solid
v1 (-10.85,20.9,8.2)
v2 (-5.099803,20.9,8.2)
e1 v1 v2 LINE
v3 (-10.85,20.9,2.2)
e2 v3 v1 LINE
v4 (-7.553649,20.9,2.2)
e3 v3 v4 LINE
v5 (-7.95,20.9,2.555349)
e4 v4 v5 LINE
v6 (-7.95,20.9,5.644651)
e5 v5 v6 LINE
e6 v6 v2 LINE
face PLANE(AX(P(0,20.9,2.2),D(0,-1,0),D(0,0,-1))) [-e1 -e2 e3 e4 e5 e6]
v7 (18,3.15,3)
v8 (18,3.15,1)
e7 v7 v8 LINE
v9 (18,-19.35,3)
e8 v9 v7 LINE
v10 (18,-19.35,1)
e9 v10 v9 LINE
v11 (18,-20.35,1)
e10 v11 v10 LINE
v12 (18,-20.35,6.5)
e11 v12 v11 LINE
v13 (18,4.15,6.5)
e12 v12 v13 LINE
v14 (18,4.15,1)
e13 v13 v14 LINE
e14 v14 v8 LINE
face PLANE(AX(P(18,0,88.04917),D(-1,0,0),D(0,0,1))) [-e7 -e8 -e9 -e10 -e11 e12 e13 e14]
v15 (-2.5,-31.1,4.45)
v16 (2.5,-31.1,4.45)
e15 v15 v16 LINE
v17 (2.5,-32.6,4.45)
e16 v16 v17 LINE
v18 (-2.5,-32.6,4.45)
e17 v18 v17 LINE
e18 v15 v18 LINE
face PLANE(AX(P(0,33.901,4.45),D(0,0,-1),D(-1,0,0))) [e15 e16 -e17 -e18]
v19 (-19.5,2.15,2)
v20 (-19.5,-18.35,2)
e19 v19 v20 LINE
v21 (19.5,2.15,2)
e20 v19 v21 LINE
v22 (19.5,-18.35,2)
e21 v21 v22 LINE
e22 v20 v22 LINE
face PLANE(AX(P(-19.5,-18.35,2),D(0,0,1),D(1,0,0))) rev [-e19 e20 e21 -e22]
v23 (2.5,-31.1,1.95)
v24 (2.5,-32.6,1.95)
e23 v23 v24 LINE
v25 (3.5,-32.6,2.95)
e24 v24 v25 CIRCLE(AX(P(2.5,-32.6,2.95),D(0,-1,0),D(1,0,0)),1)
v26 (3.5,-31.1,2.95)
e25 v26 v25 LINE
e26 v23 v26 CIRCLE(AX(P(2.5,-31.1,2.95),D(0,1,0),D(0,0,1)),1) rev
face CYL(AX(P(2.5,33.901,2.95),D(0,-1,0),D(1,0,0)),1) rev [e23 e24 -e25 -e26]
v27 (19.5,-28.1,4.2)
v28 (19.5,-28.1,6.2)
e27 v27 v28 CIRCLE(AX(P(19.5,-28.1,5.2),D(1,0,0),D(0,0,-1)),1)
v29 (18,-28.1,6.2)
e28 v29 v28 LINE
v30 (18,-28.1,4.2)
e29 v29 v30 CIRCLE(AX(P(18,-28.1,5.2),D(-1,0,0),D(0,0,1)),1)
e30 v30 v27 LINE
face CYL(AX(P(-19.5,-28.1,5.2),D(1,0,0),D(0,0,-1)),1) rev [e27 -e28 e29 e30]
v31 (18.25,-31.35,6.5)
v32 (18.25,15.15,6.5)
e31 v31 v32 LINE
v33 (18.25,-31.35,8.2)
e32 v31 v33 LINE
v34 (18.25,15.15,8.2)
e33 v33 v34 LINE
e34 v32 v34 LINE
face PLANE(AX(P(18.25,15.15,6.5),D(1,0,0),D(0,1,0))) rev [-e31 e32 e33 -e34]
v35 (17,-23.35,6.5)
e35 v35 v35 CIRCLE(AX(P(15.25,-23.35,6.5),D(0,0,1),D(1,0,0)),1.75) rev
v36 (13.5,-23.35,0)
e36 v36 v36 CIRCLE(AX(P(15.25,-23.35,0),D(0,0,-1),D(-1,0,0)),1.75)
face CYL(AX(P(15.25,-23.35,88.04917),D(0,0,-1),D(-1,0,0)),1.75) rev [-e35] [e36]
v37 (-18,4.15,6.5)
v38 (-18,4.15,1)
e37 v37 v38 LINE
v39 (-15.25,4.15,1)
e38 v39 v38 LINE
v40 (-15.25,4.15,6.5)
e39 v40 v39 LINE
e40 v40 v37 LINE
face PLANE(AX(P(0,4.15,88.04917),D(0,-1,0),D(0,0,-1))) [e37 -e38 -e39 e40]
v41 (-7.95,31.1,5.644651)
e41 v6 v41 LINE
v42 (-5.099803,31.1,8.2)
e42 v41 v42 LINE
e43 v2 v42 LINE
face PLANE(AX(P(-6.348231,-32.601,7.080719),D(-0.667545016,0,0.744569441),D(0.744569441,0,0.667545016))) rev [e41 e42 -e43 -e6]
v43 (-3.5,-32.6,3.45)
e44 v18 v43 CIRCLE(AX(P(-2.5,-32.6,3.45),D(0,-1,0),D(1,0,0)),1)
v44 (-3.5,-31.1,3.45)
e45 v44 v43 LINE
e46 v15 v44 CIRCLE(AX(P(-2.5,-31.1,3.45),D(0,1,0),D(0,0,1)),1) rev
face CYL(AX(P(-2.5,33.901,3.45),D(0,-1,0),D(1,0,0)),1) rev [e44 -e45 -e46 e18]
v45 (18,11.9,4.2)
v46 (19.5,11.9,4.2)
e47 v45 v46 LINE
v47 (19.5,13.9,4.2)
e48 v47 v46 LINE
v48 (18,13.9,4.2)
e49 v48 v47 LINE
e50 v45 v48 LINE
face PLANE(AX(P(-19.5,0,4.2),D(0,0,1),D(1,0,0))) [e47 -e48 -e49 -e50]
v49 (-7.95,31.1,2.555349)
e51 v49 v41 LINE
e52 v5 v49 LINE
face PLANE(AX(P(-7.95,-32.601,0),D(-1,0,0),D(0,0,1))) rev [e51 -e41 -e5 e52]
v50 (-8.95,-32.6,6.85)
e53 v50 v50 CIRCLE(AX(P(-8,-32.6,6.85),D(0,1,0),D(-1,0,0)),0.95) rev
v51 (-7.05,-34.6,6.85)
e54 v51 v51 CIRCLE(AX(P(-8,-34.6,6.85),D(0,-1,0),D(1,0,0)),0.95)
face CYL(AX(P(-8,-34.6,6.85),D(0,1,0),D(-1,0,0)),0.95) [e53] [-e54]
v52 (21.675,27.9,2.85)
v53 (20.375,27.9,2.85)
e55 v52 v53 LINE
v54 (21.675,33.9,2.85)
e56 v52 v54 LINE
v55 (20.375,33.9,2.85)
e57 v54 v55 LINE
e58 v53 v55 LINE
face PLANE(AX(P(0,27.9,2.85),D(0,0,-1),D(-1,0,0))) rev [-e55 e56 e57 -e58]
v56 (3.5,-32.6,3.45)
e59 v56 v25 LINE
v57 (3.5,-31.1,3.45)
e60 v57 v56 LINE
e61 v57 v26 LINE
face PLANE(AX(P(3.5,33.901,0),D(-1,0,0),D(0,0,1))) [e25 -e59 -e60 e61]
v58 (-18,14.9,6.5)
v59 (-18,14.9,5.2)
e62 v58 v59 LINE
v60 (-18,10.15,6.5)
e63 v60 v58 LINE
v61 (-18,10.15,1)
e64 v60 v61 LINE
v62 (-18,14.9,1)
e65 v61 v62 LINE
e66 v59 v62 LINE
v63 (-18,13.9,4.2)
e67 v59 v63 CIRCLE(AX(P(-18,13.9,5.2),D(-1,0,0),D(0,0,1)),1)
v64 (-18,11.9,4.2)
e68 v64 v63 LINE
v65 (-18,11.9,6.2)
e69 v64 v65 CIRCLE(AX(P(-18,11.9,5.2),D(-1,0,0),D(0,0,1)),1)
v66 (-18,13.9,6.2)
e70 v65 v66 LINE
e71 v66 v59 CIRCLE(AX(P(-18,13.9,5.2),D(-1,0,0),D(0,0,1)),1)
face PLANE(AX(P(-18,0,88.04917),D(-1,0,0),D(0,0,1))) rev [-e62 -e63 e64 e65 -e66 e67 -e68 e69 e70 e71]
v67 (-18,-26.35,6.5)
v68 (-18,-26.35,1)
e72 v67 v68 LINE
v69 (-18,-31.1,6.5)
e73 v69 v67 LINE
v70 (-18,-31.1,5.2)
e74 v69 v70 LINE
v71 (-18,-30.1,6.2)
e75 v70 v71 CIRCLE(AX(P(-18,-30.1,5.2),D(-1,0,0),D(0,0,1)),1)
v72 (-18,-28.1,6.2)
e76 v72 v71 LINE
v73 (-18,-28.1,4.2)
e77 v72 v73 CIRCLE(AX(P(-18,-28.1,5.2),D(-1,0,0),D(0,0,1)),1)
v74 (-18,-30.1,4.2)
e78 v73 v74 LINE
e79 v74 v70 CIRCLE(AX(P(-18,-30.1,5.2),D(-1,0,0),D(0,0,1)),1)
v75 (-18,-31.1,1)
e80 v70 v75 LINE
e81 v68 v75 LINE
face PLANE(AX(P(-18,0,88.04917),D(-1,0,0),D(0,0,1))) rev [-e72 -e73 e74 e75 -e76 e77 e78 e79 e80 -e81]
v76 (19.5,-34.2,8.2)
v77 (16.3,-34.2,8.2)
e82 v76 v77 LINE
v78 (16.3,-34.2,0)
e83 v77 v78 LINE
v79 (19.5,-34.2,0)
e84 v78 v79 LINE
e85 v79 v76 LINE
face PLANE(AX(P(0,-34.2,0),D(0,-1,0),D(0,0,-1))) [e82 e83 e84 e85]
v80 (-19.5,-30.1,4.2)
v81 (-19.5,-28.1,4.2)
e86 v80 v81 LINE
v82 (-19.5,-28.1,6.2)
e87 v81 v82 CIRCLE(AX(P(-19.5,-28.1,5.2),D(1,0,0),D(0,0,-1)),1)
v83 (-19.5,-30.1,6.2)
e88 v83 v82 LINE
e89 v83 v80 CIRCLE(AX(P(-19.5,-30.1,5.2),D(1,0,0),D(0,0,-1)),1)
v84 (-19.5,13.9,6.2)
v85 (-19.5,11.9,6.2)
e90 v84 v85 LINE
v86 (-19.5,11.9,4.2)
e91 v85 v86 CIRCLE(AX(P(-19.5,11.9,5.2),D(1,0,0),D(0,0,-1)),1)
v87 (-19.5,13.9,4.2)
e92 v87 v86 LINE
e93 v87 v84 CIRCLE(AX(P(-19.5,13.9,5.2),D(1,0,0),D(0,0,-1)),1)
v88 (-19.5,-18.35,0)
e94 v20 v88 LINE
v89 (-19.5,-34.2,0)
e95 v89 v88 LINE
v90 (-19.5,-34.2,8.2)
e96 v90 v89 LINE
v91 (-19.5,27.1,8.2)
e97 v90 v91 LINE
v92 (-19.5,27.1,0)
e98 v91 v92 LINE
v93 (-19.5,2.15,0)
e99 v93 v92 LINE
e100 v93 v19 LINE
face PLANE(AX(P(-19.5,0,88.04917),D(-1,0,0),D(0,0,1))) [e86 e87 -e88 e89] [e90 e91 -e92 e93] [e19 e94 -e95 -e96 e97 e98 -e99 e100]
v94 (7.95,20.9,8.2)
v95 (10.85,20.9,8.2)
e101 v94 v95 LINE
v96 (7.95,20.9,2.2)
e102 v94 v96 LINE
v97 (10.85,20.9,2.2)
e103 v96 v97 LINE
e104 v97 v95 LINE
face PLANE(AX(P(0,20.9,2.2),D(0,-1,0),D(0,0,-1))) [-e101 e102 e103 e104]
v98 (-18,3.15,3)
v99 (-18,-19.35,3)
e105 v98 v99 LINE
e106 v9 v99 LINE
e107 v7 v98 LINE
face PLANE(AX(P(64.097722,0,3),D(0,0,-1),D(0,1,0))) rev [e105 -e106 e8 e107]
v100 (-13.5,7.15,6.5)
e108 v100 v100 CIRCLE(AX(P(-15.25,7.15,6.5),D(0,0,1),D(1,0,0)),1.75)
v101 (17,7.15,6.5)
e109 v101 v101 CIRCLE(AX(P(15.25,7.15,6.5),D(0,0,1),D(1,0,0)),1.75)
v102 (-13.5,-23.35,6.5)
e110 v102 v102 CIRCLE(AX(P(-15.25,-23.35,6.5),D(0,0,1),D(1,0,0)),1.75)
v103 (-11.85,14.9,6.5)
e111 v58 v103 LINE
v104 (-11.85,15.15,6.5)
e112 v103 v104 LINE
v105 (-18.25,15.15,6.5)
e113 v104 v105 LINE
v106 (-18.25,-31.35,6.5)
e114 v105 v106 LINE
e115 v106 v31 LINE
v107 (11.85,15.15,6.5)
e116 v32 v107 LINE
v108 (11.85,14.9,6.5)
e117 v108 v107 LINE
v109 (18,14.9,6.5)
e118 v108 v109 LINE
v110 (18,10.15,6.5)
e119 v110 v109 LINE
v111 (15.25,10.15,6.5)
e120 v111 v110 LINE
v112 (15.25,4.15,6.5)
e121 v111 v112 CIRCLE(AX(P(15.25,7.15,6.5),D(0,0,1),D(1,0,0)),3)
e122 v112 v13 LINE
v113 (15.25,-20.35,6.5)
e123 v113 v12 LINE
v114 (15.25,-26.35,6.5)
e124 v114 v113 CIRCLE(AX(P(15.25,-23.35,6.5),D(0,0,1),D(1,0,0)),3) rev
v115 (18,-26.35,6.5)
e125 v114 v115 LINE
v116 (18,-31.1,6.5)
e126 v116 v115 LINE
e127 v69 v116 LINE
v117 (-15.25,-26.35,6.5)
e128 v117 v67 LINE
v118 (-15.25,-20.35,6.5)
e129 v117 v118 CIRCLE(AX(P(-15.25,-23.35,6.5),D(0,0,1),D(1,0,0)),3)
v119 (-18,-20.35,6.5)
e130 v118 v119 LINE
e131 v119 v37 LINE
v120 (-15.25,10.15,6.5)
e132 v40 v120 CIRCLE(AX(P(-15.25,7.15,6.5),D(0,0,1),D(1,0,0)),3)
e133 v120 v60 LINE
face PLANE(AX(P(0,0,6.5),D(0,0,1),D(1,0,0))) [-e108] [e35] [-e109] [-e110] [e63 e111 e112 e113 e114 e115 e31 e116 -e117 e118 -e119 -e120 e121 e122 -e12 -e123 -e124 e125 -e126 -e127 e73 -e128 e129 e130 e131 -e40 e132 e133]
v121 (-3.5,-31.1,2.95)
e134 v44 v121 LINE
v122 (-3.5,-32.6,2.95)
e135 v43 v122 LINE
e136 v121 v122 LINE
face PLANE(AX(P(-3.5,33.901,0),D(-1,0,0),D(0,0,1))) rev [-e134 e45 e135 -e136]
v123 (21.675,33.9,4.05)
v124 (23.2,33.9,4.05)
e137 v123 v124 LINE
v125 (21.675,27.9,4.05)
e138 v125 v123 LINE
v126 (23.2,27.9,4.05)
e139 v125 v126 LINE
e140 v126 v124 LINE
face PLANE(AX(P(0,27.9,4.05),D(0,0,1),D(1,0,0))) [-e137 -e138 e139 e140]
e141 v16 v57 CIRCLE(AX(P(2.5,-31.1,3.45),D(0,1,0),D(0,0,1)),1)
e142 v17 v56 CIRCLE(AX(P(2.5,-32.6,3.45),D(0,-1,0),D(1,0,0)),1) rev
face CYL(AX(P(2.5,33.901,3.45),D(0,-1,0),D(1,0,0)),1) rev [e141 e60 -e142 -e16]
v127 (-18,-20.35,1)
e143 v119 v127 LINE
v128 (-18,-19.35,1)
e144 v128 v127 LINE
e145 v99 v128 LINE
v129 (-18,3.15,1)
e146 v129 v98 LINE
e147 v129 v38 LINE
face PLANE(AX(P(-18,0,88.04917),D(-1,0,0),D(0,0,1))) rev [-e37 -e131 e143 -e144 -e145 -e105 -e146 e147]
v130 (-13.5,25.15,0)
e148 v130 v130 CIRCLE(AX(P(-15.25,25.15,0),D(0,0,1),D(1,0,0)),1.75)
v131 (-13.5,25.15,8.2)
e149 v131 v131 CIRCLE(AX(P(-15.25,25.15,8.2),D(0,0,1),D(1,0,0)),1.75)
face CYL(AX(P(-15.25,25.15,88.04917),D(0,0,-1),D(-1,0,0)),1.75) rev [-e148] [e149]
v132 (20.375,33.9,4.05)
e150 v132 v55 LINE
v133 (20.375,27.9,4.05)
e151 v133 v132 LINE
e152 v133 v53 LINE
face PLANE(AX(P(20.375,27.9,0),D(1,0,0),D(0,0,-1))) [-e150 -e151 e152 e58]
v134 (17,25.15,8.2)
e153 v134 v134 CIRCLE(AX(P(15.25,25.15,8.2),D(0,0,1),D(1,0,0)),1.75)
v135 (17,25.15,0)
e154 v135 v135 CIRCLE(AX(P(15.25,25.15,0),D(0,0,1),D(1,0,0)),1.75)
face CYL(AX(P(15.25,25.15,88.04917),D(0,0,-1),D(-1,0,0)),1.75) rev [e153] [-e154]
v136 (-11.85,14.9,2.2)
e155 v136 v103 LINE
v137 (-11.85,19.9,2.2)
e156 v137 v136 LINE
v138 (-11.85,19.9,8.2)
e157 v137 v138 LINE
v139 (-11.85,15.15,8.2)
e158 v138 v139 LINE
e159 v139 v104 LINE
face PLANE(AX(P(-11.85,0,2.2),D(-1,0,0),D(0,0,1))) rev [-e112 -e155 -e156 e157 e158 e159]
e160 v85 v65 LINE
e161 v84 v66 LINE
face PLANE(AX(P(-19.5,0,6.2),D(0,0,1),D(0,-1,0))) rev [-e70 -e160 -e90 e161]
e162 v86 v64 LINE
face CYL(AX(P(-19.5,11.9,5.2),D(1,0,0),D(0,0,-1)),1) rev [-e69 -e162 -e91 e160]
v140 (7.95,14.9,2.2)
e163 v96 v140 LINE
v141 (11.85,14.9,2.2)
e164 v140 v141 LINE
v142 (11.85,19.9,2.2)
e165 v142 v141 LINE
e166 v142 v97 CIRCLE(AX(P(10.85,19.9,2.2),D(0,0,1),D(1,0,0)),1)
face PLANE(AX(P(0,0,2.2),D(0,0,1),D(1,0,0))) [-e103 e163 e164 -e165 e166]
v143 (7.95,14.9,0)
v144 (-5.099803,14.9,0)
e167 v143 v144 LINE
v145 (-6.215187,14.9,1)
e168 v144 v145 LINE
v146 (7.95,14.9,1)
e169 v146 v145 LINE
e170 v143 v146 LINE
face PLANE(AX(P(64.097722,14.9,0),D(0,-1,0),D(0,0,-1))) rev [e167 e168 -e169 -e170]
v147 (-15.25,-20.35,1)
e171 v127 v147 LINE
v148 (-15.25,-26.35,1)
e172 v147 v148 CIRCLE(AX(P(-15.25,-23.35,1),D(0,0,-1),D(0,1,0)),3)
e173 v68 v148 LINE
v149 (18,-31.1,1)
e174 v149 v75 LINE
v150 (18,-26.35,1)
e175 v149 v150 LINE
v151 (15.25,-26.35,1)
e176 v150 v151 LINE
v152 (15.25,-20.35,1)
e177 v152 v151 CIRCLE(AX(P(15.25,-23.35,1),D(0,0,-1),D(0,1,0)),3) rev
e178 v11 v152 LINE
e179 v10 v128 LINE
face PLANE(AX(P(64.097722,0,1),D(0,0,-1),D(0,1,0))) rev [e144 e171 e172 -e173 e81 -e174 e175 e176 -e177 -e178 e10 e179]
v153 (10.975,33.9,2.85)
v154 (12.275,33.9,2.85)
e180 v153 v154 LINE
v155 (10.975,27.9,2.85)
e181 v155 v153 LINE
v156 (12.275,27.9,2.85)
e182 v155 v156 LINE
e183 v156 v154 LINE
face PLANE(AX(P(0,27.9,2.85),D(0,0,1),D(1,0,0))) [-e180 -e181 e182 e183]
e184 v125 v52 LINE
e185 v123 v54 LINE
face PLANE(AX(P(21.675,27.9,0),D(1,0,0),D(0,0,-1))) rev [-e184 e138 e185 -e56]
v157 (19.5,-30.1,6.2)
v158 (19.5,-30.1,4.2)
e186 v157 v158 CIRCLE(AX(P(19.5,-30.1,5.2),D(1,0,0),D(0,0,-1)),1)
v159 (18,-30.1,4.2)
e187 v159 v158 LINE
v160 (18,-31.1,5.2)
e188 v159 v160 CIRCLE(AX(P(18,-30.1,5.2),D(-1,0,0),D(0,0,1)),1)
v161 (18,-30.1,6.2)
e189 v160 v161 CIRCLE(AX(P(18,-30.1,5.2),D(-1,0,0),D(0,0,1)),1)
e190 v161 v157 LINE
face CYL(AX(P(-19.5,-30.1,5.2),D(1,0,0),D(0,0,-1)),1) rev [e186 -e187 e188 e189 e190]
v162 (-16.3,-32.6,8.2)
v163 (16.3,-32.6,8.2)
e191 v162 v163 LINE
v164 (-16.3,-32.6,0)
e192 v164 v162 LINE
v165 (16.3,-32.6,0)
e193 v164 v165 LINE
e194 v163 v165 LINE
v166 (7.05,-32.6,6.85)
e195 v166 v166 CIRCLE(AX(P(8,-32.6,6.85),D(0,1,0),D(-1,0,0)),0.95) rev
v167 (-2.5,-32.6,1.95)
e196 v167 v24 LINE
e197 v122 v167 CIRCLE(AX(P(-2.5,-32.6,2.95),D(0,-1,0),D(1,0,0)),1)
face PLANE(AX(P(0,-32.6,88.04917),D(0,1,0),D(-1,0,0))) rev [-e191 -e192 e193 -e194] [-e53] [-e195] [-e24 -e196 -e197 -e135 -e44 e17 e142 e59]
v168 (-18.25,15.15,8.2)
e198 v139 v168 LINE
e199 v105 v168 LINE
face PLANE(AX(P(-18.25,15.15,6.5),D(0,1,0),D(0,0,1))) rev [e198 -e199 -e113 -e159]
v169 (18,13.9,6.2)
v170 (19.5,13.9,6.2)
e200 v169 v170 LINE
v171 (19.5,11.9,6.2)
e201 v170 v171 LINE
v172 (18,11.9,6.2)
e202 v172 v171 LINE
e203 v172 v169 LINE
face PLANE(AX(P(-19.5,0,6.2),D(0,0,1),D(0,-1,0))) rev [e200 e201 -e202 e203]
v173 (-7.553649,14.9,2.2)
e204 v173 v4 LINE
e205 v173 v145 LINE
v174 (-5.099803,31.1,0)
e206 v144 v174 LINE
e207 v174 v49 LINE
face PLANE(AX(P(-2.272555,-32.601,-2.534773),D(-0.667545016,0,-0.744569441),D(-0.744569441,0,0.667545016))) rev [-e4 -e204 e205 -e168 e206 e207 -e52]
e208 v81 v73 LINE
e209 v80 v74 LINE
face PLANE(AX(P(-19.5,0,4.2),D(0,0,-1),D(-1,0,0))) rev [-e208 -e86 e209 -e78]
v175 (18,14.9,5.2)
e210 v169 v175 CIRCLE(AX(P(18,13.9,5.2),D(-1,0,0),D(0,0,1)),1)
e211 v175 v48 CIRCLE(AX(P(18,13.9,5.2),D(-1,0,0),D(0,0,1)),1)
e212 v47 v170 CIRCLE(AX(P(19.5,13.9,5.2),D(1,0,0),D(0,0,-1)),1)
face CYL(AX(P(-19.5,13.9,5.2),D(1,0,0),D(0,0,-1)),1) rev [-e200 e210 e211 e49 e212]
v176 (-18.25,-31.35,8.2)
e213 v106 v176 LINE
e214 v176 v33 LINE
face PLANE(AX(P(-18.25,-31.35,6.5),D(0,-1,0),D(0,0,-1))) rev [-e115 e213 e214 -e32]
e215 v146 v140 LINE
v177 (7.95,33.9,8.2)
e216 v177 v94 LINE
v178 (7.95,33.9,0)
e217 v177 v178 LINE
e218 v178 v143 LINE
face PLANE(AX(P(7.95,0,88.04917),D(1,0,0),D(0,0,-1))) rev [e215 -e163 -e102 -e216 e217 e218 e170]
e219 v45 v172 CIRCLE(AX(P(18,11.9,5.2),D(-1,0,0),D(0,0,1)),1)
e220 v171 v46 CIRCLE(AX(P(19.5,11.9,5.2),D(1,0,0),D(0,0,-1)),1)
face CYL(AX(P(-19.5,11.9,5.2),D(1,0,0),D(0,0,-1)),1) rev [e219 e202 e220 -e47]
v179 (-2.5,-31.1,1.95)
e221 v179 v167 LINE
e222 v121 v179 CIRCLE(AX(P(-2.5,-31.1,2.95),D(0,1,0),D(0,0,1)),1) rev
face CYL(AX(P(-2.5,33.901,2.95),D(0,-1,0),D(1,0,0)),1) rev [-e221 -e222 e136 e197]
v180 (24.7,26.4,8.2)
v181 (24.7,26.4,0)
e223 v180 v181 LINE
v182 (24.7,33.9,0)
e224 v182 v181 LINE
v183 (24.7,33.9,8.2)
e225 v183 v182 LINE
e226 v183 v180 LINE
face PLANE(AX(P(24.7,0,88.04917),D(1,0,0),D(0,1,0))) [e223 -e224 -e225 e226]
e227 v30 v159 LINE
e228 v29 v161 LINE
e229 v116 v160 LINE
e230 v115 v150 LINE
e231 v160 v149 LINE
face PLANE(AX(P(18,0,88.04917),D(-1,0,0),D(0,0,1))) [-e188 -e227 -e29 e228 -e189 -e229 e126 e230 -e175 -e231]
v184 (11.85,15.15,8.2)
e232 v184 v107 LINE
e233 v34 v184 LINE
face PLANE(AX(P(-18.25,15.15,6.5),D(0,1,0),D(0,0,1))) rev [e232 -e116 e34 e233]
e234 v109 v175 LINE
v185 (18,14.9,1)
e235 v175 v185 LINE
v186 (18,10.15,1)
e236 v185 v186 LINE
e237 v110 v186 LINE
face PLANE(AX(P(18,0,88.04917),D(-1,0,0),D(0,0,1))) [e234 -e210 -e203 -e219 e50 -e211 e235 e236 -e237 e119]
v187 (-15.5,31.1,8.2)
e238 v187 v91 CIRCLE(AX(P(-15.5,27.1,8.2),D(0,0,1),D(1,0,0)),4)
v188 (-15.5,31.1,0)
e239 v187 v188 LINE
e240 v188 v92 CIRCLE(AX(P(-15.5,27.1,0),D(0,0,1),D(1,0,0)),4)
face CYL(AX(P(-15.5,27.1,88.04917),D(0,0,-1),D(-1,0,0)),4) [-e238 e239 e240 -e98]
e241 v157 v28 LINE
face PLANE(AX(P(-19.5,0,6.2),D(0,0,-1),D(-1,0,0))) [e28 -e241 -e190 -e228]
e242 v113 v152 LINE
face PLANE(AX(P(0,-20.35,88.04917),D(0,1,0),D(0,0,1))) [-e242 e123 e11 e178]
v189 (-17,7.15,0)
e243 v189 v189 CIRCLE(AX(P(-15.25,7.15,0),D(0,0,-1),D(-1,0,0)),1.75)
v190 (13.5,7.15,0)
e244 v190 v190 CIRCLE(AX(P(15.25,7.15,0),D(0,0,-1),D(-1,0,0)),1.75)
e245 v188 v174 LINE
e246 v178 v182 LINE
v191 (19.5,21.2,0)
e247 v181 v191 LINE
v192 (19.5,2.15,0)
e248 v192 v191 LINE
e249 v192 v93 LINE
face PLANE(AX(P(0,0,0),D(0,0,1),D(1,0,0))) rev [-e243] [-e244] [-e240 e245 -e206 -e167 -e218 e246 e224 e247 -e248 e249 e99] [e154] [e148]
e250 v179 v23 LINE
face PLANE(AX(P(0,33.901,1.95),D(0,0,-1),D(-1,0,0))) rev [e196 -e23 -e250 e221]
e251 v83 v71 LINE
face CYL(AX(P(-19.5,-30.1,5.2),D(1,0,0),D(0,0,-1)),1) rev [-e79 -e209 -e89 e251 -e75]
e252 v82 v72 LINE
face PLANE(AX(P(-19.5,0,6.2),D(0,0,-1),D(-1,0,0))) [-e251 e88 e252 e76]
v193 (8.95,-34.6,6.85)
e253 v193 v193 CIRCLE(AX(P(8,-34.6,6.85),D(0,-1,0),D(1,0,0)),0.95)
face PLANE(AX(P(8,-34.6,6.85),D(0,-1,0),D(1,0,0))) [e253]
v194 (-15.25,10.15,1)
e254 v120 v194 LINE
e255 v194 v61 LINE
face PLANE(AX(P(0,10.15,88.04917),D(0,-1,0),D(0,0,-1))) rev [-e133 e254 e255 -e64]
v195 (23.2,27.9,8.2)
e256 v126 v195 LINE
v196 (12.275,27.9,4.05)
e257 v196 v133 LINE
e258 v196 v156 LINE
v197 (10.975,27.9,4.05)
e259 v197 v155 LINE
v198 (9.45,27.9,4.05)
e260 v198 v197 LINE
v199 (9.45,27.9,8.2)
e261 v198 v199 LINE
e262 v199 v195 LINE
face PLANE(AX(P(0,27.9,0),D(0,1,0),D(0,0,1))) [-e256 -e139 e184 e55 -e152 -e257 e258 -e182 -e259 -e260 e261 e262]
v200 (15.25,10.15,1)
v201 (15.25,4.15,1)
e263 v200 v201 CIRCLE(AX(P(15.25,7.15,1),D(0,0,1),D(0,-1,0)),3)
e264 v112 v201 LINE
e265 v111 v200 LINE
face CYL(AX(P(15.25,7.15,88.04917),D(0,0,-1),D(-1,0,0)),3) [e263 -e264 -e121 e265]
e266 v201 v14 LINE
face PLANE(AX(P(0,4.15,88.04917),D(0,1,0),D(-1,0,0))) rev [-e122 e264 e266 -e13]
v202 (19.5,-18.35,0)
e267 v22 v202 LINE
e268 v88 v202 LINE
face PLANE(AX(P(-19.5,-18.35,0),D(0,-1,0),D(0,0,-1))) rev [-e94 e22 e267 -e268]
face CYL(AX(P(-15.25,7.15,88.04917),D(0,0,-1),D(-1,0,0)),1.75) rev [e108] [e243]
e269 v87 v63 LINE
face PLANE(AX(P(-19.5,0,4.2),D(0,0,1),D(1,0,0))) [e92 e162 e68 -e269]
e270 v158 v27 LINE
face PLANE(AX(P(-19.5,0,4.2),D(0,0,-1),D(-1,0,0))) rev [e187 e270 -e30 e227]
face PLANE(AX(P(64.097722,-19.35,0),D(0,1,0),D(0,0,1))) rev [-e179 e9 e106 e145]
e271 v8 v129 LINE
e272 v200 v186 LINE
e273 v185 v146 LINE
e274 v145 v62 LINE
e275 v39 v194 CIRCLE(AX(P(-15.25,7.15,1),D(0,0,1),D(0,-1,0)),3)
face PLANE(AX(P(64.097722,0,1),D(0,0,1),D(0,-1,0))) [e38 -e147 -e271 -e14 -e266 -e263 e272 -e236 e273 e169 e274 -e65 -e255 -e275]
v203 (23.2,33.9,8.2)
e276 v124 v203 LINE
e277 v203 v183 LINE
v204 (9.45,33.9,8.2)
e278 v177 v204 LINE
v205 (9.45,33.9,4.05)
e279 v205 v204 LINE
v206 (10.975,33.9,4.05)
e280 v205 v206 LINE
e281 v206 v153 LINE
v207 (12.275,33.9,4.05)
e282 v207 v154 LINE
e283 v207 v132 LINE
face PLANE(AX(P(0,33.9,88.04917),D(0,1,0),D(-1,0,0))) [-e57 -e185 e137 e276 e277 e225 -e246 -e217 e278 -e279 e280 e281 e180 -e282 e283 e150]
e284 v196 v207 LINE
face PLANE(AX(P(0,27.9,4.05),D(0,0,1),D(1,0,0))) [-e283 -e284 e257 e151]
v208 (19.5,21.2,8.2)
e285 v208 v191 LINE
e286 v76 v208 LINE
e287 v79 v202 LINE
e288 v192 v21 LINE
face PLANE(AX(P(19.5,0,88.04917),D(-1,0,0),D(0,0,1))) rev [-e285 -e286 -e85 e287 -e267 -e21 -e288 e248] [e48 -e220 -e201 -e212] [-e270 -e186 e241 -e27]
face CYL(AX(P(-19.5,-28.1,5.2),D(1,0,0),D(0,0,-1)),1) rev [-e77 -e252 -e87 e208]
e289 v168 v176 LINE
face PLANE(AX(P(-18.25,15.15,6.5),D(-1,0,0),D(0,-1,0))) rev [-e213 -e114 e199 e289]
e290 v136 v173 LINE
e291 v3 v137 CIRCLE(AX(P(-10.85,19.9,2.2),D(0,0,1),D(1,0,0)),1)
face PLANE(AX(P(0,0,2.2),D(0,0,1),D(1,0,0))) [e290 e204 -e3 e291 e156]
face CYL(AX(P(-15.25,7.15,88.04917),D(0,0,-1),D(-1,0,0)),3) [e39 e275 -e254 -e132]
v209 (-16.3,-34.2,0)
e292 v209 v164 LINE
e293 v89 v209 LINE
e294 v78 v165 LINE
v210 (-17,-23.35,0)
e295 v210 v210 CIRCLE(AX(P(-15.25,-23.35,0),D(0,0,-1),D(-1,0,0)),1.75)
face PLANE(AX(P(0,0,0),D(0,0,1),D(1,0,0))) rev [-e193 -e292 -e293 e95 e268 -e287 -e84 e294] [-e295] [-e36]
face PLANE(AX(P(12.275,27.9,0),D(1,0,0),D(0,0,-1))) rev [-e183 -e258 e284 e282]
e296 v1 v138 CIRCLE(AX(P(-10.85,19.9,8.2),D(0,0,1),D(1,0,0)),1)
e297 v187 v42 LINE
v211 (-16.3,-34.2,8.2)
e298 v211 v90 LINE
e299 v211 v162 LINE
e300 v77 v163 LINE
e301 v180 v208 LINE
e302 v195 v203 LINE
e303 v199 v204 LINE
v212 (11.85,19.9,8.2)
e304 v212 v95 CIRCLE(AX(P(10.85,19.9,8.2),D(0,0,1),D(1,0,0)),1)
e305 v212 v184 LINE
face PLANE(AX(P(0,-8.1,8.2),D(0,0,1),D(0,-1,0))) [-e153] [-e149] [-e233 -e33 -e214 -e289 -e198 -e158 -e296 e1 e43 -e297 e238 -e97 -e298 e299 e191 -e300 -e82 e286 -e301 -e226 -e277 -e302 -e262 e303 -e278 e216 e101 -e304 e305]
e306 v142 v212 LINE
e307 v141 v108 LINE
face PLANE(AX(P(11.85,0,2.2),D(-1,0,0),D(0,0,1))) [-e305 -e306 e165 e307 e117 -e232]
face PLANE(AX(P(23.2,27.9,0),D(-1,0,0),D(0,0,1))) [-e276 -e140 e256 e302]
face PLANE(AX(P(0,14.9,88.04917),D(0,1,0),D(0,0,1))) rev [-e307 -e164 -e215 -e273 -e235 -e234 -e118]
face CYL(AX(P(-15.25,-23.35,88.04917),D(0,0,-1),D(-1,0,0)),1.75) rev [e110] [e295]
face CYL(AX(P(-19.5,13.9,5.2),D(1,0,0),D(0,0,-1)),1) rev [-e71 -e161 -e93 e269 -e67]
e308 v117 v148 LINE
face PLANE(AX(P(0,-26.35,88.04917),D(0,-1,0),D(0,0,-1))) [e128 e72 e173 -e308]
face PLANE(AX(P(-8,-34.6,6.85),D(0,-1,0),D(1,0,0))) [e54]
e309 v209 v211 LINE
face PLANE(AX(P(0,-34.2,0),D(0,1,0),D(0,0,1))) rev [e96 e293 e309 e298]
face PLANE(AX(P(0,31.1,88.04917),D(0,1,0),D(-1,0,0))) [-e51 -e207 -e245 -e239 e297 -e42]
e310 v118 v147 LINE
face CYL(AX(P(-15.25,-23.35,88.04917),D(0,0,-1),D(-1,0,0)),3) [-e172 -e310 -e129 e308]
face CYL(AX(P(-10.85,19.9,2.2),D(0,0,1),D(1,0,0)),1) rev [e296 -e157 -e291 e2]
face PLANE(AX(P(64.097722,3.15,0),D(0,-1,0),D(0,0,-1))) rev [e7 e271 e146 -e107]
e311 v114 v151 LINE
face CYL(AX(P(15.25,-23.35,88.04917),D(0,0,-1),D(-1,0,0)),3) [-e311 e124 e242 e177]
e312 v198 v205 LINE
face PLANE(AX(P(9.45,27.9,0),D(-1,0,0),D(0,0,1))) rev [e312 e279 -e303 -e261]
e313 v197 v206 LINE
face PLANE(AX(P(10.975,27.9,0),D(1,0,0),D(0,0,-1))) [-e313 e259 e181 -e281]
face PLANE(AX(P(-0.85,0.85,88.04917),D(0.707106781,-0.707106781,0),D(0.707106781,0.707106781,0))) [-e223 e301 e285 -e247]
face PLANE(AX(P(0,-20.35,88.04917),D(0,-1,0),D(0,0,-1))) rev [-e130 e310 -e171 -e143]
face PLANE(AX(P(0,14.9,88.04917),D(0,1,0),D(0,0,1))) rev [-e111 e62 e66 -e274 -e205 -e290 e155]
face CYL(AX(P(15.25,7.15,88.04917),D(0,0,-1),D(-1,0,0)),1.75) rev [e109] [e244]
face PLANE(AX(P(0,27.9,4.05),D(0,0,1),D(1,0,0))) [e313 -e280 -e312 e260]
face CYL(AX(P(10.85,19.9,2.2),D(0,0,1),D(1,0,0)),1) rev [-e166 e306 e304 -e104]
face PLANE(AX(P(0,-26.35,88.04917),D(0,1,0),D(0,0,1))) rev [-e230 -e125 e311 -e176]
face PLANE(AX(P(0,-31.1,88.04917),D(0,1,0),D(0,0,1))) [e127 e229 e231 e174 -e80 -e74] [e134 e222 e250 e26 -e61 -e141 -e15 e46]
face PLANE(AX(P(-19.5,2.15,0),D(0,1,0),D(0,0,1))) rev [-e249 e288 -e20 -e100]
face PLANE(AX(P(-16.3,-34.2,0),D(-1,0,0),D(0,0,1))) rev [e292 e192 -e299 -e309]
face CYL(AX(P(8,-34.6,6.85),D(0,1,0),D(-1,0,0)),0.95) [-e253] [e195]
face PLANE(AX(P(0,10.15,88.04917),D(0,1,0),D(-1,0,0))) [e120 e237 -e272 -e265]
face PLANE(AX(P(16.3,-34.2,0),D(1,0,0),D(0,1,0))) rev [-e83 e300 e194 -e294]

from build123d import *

# Parameters (mm, degrees)
SKETCH1_R              = 1.75
BASE_SHAPE_DEPTH       = 8.2
SKETCH3_W              = 2
SKETCH3_H              = 20.5
STRAP_CUT_DEPTH        = 53.32064602
XT60_CUT_REACH         = 70.811
SKETCH5_R              = 1
POWER_WIRES_CUT_DEPTH  = 53.32064602
SKETCH6_W              = 23.7
SKETCH6_H              = 5
IO_WIRES_CUT_DEPTH     = 6
BOTTOM_DEPTH           = 36
BOTTOM_START           = -1
BOTTOM_HOLES_OUTLINE_R = 1.75
BOTTOM_HOLES_DEPTH     = 1
SKETCH8_W              = 36.5
SKETCH8_H              = 46.5
PCB_CUT_DEPTH          = 1.7
LEDBAR_WIRES_CUT_REACH = 73.411
SKETCH13_W             = 3.2
SKETCH13_H             = 8.2
LEDBAR_SIDES_DEPTH     = 1.6
SKETCH14_R             = 0.95
LEDBAR_MOUNTS_DEPTH    = 2
SKETCH16_W             = 13.75
SKETCH16_H             = 4.15
SKETCH16_W_2           = 1.3
SKETCH16_H_2           = 1.2
BALANCE_PLUG_CUT_DEPTH = 6


with BuildPart() as part:
    # Sketch1 → Base shape (new body)
    with BuildSketch(Plane.XY):
        with BuildLine():
            ThreePointArc((-15.5, 31.1), (-18.328427125, 29.928427125), (-19.5, 27.1))
            Line((-19.5, 27.1), (-19.5, -32.6))
            Line((-19.5, -32.6), (19.5, -32.6))
            Line((19.5, -32.6), (19.5, 21.2))
            Line((19.5, 21.2), (24.7, 26.4))
            Line((24.7, 26.4), (24.7, 33.9))
            Line((24.7, 33.9), (7.95, 33.9))
            Line((7.95, 33.9), (7.95, 31.1))
            Line((7.95, 31.1), (-15.5, 31.1))
        make_face()
        with Locations((-15.25, -23.35)):
            Circle(SKETCH1_R, mode=Mode.SUBTRACT)
        with Locations((15.25, -23.35)):
            Circle(SKETCH1_R, mode=Mode.SUBTRACT)
        with BuildLine():
            Line((-18, -20.35), (-18, 4.15))
            Line((-18, 4.15), (-15.25, 4.15))
            ThreePointArc((-15.25, 4.15), (-12.25, 7.15), (-15.25, 10.15))
            Line((-15.25, 10.15), (-18, 10.15))
            Line((-18, 10.15), (-18, 14.9))
            Line((-18, 14.9), (18, 14.9))
            Line((18, 14.9), (18, 10.15))
            Line((18, 10.15), (15.25, 10.15))
            ThreePointArc((15.25, 10.15), (12.25, 7.15), (15.25, 4.15))
            Line((15.25, 4.15), (18, 4.15))
            Line((18, 4.15), (18, -20.35))
            Line((18, -20.35), (15.25, -20.35))
            ThreePointArc((15.25, -20.35), (12.25, -23.35), (15.25, -26.35))
            Line((15.25, -26.35), (18, -26.35))
            Line((18, -26.35), (18, -31.1))
            Line((18, -31.1), (-18, -31.1))
            Line((-18, -31.1), (-18, -26.35))
            Line((-18, -26.35), (-15.25, -26.35))
            ThreePointArc((-15.25, -26.35), (-12.25, -23.35), (-15.25, -20.35))
            Line((-15.25, -20.35), (-18, -20.35))
        make_face(mode=Mode.SUBTRACT)
        with Locations((-15.25, 7.15)):
            Circle(SKETCH1_R, mode=Mode.SUBTRACT)
        with Locations((-15.25, 25.15)):
            Circle(SKETCH1_R, mode=Mode.SUBTRACT)
        with Locations((15.25, 7.15)):
            Circle(SKETCH1_R, mode=Mode.SUBTRACT)
        with Locations((15.25, 25.15)):
            Circle(SKETCH1_R, mode=Mode.SUBTRACT)
    extrude(amount=BASE_SHAPE_DEPTH)

    # Sketch3 → Strap cut (cut, through all)
    with BuildSketch(Plane(origin=(19.5, 0, 0), x_dir=(0, 0, -1), z_dir=(1, 0, 0))):
        with Locations((-1, -8.1)):
            Rectangle(SKETCH3_W, SKETCH3_H)
    extrude(amount=-STRAP_CUT_DEPTH, mode=Mode.SUBTRACT)

    # Sketch4 → XT60 cut (cut, up to next)
    with BuildSketch(Plane(origin=(0, 31.1, 0), x_dir=(1, 0, 0), z_dir=(0, 1, 0)), mode=Mode.PRIVATE) as xt60_cut_sk1:
        Polygon((7.95, -8.2), (7.95, 0), (-5.099802631, 0), (-7.95, -2.555349365), (-7.95, -5.644650635), (-5.099802631, -8.2), align=None)
    xt60_cut_tool1 = extrude(xt60_cut_sk1.sketch, amount=-XT60_CUT_REACH, mode=Mode.PRIVATE) & part.part
    add(xt60_cut_tool1.solids().sort_by_distance((0.414164, 31.1, 4.1))[0], mode=Mode.SUBTRACT)

    # Sketch5 → Power wires cut (cut, through all)
    with BuildSketch(Plane(origin=(19.5, 0, 0), x_dir=(0, 0, -1), z_dir=(1, 0, 0))):
        with Locations((-5.2, 13.9)):
            Circle(SKETCH5_R)
        with Locations((-5.2, 11.9)):
            Circle(SKETCH5_R)
        with BuildLine():
            ThreePointArc((-5.2, 12.9), (-5.907106781, 13.192893219), (-6.2, 13.9))
            Line((-6.2, 13.9), (-6.2, 11.9))
            ThreePointArc((-6.2, 11.9), (-5.907106781, 12.607106781), (-5.2, 12.9))
        make_face()
        with BuildLine():
            Line((-4.2, 11.9), (-4.2, 13.9))
            ThreePointArc((-4.2, 13.9), (-4.492893219, 13.192893219), (-5.2, 12.9))
            ThreePointArc((-5.2, 12.9), (-4.492893219, 12.607106781), (-4.2, 11.9))
        make_face()
        with Locations((-5.2, -30.1)):
            Circle(SKETCH5_R)
        with Locations((-5.2, -28.1)):
            Circle(SKETCH5_R)
        with BuildLine():
            ThreePointArc((-5.2, -29.1), (-4.492893219, -29.392893219), (-4.2, -30.1))
            Line((-4.2, -30.1), (-4.2, -28.1))
            ThreePointArc((-4.2, -28.1), (-4.492893219, -28.807106781), (-5.2, -29.1))
        make_face()
        with BuildLine():
            Line((-6.2, -28.1), (-6.2, -30.1))
            ThreePointArc((-6.2, -30.1), (-5.907106781, -29.392893219), (-5.2, -29.1))
            ThreePointArc((-5.2, -29.1), (-5.907106781, -28.807106781), (-6.2, -28.1))
        make_face()
    extrude(amount=-POWER_WIRES_CUT_DEPTH, mode=Mode.SUBTRACT)

    # Sketch6 → IO wires cut (cut)
    with BuildSketch(Plane.XY.offset(8.2)):
        with BuildLine():
            ThreePointArc((-10.85, 20.9), (-11.557106781, 20.607106781), (-11.85, 19.9))
            Line((-11.85, 19.9), (11.85, 19.9))
            ThreePointArc((11.85, 19.9), (11.557106781, 20.607106781), (10.85, 20.9))
            Line((10.85, 20.9), (-10.85, 20.9))
        make_face()
        with Locations((0, 17.4)):
            Rectangle(SKETCH6_W, SKETCH6_H)
    extrude(amount=-IO_WIRES_CUT_DEPTH, mode=Mode.SUBTRACT)

    # Bottom: read off the stored shape, not the designer's step
    # Bottom outline → Bottom (add)
    with BuildSketch(Plane(origin=(-18, 0, 0), x_dir=(0, 0, -1), z_dir=(1, 0, 0))):
        Polygon((0, -18.35), (-2, -18.35), (-2, 2.15), (0, 2.15), (0, 14.9), (-1, 14.9), (-1, 3.15), (-3, 3.15), (-3, -19.35), (-1, -19.35), (-1, -31.1), (0, -31.1), align=None)
    extrude(amount=BOTTOM_DEPTH)

    # Bottom holes: read off the stored shape, not the designer's step
    # Bottom holes outline → Bottom holes (cut)
    with BuildSketch(Plane(origin=(0, 0, 0), x_dir=(-1, 0, 0), z_dir=(0, 0, -1)).offset(BOTTOM_START)):
        with Locations((-15.25, -23.35)):
            Circle(BOTTOM_HOLES_OUTLINE_R)
        with Locations((15.25, -23.35)):
            Circle(BOTTOM_HOLES_OUTLINE_R)
        with Locations((15.25, 7.15)):
            Circle(BOTTOM_HOLES_OUTLINE_R)
        with Locations((-15.25, 7.15)):
            Circle(BOTTOM_HOLES_OUTLINE_R)
    extrude(amount=BOTTOM_HOLES_DEPTH, mode=Mode.SUBTRACT)

    # Sketch8 → PCB cut (cut)
    with BuildSketch(Plane.XY.offset(8.2)):
        with Locations((0, -8.1)):
            Rectangle(SKETCH8_W, SKETCH8_H)
    extrude(amount=-PCB_CUT_DEPTH, mode=Mode.SUBTRACT)

    # Sketch11 → Ledbar wires cut (cut, up to next)
    with BuildSketch(Plane.XZ.offset(32.6), mode=Mode.PRIVATE) as ledbar_wires_cut_sk1:
        with BuildLine():
            Line((-2.5, 4.45), (2.5, 4.45))
            ThreePointArc((2.5, 4.45), (3.207106781, 4.157106781), (3.5, 3.45))
            Line((3.5, 3.45), (3.5, 2.95))
            ThreePointArc((3.5, 2.95), (3.207106781, 2.242893219), (2.5, 1.95))
            Line((2.5, 1.95), (-2.5, 1.95))
            ThreePointArc((-2.5, 1.95), (-3.207106781, 2.242893219), (-3.5, 2.95))
            Line((-3.5, 2.95), (-3.5, 3.45))
            ThreePointArc((-3.5, 3.45), (-3.207106781, 4.157106781), (-2.5, 4.45))
        make_face()
    ledbar_wires_cut_tool1 = extrude(ledbar_wires_cut_sk1.sketch, amount=-LEDBAR_WIRES_CUT_REACH, mode=Mode.PRIVATE) & part.part
    add(ledbar_wires_cut_tool1.solids().sort_by_distance((0, -32.6, 3.2))[0], mode=Mode.SUBTRACT)

    # Sketch13 → Ledbar sides (add)
    with BuildSketch(Plane.XZ.offset(32.6)):
        with Locations((17.9, 4.1)):
            Rectangle(SKETCH13_W, SKETCH13_H)
        with Locations((-17.9, 4.1)):
            Rectangle(SKETCH13_W, SKETCH13_H)
    extrude(amount=LEDBAR_SIDES_DEPTH)

    # Sketch14 → Ledbar mounts (add)
    with BuildSketch(Plane.XZ.offset(32.6)):
        with Locations(Location((8, 6.85, 0), (0, 0, 180))):
            Circle(SKETCH14_R)
        with Locations(Location((-8, 6.85, 0), (0, 0, 180))):
            Circle(SKETCH14_R)
    extrude(amount=LEDBAR_MOUNTS_DEPTH)

    # Sketch16 → Balance plug cut (cut)
    with BuildSketch(Plane(origin=(0, 33.9, 0), x_dir=(1, 0, 0), z_dir=(0, 1, 0))):
        with Locations((16.325, -6.125)):
            Rectangle(SKETCH16_W, SKETCH16_H)
        with Locations((11.625, -3.45)):
            Rectangle(SKETCH16_W_2, SKETCH16_H_2)
        with Locations((21.025, -3.45)):
            Rectangle(SKETCH16_W_2, SKETCH16_H_2)
    extrude(amount=-BALANCE_PLUG_CUT_DEPTH, mode=Mode.SUBTRACT)


solid = part.part
